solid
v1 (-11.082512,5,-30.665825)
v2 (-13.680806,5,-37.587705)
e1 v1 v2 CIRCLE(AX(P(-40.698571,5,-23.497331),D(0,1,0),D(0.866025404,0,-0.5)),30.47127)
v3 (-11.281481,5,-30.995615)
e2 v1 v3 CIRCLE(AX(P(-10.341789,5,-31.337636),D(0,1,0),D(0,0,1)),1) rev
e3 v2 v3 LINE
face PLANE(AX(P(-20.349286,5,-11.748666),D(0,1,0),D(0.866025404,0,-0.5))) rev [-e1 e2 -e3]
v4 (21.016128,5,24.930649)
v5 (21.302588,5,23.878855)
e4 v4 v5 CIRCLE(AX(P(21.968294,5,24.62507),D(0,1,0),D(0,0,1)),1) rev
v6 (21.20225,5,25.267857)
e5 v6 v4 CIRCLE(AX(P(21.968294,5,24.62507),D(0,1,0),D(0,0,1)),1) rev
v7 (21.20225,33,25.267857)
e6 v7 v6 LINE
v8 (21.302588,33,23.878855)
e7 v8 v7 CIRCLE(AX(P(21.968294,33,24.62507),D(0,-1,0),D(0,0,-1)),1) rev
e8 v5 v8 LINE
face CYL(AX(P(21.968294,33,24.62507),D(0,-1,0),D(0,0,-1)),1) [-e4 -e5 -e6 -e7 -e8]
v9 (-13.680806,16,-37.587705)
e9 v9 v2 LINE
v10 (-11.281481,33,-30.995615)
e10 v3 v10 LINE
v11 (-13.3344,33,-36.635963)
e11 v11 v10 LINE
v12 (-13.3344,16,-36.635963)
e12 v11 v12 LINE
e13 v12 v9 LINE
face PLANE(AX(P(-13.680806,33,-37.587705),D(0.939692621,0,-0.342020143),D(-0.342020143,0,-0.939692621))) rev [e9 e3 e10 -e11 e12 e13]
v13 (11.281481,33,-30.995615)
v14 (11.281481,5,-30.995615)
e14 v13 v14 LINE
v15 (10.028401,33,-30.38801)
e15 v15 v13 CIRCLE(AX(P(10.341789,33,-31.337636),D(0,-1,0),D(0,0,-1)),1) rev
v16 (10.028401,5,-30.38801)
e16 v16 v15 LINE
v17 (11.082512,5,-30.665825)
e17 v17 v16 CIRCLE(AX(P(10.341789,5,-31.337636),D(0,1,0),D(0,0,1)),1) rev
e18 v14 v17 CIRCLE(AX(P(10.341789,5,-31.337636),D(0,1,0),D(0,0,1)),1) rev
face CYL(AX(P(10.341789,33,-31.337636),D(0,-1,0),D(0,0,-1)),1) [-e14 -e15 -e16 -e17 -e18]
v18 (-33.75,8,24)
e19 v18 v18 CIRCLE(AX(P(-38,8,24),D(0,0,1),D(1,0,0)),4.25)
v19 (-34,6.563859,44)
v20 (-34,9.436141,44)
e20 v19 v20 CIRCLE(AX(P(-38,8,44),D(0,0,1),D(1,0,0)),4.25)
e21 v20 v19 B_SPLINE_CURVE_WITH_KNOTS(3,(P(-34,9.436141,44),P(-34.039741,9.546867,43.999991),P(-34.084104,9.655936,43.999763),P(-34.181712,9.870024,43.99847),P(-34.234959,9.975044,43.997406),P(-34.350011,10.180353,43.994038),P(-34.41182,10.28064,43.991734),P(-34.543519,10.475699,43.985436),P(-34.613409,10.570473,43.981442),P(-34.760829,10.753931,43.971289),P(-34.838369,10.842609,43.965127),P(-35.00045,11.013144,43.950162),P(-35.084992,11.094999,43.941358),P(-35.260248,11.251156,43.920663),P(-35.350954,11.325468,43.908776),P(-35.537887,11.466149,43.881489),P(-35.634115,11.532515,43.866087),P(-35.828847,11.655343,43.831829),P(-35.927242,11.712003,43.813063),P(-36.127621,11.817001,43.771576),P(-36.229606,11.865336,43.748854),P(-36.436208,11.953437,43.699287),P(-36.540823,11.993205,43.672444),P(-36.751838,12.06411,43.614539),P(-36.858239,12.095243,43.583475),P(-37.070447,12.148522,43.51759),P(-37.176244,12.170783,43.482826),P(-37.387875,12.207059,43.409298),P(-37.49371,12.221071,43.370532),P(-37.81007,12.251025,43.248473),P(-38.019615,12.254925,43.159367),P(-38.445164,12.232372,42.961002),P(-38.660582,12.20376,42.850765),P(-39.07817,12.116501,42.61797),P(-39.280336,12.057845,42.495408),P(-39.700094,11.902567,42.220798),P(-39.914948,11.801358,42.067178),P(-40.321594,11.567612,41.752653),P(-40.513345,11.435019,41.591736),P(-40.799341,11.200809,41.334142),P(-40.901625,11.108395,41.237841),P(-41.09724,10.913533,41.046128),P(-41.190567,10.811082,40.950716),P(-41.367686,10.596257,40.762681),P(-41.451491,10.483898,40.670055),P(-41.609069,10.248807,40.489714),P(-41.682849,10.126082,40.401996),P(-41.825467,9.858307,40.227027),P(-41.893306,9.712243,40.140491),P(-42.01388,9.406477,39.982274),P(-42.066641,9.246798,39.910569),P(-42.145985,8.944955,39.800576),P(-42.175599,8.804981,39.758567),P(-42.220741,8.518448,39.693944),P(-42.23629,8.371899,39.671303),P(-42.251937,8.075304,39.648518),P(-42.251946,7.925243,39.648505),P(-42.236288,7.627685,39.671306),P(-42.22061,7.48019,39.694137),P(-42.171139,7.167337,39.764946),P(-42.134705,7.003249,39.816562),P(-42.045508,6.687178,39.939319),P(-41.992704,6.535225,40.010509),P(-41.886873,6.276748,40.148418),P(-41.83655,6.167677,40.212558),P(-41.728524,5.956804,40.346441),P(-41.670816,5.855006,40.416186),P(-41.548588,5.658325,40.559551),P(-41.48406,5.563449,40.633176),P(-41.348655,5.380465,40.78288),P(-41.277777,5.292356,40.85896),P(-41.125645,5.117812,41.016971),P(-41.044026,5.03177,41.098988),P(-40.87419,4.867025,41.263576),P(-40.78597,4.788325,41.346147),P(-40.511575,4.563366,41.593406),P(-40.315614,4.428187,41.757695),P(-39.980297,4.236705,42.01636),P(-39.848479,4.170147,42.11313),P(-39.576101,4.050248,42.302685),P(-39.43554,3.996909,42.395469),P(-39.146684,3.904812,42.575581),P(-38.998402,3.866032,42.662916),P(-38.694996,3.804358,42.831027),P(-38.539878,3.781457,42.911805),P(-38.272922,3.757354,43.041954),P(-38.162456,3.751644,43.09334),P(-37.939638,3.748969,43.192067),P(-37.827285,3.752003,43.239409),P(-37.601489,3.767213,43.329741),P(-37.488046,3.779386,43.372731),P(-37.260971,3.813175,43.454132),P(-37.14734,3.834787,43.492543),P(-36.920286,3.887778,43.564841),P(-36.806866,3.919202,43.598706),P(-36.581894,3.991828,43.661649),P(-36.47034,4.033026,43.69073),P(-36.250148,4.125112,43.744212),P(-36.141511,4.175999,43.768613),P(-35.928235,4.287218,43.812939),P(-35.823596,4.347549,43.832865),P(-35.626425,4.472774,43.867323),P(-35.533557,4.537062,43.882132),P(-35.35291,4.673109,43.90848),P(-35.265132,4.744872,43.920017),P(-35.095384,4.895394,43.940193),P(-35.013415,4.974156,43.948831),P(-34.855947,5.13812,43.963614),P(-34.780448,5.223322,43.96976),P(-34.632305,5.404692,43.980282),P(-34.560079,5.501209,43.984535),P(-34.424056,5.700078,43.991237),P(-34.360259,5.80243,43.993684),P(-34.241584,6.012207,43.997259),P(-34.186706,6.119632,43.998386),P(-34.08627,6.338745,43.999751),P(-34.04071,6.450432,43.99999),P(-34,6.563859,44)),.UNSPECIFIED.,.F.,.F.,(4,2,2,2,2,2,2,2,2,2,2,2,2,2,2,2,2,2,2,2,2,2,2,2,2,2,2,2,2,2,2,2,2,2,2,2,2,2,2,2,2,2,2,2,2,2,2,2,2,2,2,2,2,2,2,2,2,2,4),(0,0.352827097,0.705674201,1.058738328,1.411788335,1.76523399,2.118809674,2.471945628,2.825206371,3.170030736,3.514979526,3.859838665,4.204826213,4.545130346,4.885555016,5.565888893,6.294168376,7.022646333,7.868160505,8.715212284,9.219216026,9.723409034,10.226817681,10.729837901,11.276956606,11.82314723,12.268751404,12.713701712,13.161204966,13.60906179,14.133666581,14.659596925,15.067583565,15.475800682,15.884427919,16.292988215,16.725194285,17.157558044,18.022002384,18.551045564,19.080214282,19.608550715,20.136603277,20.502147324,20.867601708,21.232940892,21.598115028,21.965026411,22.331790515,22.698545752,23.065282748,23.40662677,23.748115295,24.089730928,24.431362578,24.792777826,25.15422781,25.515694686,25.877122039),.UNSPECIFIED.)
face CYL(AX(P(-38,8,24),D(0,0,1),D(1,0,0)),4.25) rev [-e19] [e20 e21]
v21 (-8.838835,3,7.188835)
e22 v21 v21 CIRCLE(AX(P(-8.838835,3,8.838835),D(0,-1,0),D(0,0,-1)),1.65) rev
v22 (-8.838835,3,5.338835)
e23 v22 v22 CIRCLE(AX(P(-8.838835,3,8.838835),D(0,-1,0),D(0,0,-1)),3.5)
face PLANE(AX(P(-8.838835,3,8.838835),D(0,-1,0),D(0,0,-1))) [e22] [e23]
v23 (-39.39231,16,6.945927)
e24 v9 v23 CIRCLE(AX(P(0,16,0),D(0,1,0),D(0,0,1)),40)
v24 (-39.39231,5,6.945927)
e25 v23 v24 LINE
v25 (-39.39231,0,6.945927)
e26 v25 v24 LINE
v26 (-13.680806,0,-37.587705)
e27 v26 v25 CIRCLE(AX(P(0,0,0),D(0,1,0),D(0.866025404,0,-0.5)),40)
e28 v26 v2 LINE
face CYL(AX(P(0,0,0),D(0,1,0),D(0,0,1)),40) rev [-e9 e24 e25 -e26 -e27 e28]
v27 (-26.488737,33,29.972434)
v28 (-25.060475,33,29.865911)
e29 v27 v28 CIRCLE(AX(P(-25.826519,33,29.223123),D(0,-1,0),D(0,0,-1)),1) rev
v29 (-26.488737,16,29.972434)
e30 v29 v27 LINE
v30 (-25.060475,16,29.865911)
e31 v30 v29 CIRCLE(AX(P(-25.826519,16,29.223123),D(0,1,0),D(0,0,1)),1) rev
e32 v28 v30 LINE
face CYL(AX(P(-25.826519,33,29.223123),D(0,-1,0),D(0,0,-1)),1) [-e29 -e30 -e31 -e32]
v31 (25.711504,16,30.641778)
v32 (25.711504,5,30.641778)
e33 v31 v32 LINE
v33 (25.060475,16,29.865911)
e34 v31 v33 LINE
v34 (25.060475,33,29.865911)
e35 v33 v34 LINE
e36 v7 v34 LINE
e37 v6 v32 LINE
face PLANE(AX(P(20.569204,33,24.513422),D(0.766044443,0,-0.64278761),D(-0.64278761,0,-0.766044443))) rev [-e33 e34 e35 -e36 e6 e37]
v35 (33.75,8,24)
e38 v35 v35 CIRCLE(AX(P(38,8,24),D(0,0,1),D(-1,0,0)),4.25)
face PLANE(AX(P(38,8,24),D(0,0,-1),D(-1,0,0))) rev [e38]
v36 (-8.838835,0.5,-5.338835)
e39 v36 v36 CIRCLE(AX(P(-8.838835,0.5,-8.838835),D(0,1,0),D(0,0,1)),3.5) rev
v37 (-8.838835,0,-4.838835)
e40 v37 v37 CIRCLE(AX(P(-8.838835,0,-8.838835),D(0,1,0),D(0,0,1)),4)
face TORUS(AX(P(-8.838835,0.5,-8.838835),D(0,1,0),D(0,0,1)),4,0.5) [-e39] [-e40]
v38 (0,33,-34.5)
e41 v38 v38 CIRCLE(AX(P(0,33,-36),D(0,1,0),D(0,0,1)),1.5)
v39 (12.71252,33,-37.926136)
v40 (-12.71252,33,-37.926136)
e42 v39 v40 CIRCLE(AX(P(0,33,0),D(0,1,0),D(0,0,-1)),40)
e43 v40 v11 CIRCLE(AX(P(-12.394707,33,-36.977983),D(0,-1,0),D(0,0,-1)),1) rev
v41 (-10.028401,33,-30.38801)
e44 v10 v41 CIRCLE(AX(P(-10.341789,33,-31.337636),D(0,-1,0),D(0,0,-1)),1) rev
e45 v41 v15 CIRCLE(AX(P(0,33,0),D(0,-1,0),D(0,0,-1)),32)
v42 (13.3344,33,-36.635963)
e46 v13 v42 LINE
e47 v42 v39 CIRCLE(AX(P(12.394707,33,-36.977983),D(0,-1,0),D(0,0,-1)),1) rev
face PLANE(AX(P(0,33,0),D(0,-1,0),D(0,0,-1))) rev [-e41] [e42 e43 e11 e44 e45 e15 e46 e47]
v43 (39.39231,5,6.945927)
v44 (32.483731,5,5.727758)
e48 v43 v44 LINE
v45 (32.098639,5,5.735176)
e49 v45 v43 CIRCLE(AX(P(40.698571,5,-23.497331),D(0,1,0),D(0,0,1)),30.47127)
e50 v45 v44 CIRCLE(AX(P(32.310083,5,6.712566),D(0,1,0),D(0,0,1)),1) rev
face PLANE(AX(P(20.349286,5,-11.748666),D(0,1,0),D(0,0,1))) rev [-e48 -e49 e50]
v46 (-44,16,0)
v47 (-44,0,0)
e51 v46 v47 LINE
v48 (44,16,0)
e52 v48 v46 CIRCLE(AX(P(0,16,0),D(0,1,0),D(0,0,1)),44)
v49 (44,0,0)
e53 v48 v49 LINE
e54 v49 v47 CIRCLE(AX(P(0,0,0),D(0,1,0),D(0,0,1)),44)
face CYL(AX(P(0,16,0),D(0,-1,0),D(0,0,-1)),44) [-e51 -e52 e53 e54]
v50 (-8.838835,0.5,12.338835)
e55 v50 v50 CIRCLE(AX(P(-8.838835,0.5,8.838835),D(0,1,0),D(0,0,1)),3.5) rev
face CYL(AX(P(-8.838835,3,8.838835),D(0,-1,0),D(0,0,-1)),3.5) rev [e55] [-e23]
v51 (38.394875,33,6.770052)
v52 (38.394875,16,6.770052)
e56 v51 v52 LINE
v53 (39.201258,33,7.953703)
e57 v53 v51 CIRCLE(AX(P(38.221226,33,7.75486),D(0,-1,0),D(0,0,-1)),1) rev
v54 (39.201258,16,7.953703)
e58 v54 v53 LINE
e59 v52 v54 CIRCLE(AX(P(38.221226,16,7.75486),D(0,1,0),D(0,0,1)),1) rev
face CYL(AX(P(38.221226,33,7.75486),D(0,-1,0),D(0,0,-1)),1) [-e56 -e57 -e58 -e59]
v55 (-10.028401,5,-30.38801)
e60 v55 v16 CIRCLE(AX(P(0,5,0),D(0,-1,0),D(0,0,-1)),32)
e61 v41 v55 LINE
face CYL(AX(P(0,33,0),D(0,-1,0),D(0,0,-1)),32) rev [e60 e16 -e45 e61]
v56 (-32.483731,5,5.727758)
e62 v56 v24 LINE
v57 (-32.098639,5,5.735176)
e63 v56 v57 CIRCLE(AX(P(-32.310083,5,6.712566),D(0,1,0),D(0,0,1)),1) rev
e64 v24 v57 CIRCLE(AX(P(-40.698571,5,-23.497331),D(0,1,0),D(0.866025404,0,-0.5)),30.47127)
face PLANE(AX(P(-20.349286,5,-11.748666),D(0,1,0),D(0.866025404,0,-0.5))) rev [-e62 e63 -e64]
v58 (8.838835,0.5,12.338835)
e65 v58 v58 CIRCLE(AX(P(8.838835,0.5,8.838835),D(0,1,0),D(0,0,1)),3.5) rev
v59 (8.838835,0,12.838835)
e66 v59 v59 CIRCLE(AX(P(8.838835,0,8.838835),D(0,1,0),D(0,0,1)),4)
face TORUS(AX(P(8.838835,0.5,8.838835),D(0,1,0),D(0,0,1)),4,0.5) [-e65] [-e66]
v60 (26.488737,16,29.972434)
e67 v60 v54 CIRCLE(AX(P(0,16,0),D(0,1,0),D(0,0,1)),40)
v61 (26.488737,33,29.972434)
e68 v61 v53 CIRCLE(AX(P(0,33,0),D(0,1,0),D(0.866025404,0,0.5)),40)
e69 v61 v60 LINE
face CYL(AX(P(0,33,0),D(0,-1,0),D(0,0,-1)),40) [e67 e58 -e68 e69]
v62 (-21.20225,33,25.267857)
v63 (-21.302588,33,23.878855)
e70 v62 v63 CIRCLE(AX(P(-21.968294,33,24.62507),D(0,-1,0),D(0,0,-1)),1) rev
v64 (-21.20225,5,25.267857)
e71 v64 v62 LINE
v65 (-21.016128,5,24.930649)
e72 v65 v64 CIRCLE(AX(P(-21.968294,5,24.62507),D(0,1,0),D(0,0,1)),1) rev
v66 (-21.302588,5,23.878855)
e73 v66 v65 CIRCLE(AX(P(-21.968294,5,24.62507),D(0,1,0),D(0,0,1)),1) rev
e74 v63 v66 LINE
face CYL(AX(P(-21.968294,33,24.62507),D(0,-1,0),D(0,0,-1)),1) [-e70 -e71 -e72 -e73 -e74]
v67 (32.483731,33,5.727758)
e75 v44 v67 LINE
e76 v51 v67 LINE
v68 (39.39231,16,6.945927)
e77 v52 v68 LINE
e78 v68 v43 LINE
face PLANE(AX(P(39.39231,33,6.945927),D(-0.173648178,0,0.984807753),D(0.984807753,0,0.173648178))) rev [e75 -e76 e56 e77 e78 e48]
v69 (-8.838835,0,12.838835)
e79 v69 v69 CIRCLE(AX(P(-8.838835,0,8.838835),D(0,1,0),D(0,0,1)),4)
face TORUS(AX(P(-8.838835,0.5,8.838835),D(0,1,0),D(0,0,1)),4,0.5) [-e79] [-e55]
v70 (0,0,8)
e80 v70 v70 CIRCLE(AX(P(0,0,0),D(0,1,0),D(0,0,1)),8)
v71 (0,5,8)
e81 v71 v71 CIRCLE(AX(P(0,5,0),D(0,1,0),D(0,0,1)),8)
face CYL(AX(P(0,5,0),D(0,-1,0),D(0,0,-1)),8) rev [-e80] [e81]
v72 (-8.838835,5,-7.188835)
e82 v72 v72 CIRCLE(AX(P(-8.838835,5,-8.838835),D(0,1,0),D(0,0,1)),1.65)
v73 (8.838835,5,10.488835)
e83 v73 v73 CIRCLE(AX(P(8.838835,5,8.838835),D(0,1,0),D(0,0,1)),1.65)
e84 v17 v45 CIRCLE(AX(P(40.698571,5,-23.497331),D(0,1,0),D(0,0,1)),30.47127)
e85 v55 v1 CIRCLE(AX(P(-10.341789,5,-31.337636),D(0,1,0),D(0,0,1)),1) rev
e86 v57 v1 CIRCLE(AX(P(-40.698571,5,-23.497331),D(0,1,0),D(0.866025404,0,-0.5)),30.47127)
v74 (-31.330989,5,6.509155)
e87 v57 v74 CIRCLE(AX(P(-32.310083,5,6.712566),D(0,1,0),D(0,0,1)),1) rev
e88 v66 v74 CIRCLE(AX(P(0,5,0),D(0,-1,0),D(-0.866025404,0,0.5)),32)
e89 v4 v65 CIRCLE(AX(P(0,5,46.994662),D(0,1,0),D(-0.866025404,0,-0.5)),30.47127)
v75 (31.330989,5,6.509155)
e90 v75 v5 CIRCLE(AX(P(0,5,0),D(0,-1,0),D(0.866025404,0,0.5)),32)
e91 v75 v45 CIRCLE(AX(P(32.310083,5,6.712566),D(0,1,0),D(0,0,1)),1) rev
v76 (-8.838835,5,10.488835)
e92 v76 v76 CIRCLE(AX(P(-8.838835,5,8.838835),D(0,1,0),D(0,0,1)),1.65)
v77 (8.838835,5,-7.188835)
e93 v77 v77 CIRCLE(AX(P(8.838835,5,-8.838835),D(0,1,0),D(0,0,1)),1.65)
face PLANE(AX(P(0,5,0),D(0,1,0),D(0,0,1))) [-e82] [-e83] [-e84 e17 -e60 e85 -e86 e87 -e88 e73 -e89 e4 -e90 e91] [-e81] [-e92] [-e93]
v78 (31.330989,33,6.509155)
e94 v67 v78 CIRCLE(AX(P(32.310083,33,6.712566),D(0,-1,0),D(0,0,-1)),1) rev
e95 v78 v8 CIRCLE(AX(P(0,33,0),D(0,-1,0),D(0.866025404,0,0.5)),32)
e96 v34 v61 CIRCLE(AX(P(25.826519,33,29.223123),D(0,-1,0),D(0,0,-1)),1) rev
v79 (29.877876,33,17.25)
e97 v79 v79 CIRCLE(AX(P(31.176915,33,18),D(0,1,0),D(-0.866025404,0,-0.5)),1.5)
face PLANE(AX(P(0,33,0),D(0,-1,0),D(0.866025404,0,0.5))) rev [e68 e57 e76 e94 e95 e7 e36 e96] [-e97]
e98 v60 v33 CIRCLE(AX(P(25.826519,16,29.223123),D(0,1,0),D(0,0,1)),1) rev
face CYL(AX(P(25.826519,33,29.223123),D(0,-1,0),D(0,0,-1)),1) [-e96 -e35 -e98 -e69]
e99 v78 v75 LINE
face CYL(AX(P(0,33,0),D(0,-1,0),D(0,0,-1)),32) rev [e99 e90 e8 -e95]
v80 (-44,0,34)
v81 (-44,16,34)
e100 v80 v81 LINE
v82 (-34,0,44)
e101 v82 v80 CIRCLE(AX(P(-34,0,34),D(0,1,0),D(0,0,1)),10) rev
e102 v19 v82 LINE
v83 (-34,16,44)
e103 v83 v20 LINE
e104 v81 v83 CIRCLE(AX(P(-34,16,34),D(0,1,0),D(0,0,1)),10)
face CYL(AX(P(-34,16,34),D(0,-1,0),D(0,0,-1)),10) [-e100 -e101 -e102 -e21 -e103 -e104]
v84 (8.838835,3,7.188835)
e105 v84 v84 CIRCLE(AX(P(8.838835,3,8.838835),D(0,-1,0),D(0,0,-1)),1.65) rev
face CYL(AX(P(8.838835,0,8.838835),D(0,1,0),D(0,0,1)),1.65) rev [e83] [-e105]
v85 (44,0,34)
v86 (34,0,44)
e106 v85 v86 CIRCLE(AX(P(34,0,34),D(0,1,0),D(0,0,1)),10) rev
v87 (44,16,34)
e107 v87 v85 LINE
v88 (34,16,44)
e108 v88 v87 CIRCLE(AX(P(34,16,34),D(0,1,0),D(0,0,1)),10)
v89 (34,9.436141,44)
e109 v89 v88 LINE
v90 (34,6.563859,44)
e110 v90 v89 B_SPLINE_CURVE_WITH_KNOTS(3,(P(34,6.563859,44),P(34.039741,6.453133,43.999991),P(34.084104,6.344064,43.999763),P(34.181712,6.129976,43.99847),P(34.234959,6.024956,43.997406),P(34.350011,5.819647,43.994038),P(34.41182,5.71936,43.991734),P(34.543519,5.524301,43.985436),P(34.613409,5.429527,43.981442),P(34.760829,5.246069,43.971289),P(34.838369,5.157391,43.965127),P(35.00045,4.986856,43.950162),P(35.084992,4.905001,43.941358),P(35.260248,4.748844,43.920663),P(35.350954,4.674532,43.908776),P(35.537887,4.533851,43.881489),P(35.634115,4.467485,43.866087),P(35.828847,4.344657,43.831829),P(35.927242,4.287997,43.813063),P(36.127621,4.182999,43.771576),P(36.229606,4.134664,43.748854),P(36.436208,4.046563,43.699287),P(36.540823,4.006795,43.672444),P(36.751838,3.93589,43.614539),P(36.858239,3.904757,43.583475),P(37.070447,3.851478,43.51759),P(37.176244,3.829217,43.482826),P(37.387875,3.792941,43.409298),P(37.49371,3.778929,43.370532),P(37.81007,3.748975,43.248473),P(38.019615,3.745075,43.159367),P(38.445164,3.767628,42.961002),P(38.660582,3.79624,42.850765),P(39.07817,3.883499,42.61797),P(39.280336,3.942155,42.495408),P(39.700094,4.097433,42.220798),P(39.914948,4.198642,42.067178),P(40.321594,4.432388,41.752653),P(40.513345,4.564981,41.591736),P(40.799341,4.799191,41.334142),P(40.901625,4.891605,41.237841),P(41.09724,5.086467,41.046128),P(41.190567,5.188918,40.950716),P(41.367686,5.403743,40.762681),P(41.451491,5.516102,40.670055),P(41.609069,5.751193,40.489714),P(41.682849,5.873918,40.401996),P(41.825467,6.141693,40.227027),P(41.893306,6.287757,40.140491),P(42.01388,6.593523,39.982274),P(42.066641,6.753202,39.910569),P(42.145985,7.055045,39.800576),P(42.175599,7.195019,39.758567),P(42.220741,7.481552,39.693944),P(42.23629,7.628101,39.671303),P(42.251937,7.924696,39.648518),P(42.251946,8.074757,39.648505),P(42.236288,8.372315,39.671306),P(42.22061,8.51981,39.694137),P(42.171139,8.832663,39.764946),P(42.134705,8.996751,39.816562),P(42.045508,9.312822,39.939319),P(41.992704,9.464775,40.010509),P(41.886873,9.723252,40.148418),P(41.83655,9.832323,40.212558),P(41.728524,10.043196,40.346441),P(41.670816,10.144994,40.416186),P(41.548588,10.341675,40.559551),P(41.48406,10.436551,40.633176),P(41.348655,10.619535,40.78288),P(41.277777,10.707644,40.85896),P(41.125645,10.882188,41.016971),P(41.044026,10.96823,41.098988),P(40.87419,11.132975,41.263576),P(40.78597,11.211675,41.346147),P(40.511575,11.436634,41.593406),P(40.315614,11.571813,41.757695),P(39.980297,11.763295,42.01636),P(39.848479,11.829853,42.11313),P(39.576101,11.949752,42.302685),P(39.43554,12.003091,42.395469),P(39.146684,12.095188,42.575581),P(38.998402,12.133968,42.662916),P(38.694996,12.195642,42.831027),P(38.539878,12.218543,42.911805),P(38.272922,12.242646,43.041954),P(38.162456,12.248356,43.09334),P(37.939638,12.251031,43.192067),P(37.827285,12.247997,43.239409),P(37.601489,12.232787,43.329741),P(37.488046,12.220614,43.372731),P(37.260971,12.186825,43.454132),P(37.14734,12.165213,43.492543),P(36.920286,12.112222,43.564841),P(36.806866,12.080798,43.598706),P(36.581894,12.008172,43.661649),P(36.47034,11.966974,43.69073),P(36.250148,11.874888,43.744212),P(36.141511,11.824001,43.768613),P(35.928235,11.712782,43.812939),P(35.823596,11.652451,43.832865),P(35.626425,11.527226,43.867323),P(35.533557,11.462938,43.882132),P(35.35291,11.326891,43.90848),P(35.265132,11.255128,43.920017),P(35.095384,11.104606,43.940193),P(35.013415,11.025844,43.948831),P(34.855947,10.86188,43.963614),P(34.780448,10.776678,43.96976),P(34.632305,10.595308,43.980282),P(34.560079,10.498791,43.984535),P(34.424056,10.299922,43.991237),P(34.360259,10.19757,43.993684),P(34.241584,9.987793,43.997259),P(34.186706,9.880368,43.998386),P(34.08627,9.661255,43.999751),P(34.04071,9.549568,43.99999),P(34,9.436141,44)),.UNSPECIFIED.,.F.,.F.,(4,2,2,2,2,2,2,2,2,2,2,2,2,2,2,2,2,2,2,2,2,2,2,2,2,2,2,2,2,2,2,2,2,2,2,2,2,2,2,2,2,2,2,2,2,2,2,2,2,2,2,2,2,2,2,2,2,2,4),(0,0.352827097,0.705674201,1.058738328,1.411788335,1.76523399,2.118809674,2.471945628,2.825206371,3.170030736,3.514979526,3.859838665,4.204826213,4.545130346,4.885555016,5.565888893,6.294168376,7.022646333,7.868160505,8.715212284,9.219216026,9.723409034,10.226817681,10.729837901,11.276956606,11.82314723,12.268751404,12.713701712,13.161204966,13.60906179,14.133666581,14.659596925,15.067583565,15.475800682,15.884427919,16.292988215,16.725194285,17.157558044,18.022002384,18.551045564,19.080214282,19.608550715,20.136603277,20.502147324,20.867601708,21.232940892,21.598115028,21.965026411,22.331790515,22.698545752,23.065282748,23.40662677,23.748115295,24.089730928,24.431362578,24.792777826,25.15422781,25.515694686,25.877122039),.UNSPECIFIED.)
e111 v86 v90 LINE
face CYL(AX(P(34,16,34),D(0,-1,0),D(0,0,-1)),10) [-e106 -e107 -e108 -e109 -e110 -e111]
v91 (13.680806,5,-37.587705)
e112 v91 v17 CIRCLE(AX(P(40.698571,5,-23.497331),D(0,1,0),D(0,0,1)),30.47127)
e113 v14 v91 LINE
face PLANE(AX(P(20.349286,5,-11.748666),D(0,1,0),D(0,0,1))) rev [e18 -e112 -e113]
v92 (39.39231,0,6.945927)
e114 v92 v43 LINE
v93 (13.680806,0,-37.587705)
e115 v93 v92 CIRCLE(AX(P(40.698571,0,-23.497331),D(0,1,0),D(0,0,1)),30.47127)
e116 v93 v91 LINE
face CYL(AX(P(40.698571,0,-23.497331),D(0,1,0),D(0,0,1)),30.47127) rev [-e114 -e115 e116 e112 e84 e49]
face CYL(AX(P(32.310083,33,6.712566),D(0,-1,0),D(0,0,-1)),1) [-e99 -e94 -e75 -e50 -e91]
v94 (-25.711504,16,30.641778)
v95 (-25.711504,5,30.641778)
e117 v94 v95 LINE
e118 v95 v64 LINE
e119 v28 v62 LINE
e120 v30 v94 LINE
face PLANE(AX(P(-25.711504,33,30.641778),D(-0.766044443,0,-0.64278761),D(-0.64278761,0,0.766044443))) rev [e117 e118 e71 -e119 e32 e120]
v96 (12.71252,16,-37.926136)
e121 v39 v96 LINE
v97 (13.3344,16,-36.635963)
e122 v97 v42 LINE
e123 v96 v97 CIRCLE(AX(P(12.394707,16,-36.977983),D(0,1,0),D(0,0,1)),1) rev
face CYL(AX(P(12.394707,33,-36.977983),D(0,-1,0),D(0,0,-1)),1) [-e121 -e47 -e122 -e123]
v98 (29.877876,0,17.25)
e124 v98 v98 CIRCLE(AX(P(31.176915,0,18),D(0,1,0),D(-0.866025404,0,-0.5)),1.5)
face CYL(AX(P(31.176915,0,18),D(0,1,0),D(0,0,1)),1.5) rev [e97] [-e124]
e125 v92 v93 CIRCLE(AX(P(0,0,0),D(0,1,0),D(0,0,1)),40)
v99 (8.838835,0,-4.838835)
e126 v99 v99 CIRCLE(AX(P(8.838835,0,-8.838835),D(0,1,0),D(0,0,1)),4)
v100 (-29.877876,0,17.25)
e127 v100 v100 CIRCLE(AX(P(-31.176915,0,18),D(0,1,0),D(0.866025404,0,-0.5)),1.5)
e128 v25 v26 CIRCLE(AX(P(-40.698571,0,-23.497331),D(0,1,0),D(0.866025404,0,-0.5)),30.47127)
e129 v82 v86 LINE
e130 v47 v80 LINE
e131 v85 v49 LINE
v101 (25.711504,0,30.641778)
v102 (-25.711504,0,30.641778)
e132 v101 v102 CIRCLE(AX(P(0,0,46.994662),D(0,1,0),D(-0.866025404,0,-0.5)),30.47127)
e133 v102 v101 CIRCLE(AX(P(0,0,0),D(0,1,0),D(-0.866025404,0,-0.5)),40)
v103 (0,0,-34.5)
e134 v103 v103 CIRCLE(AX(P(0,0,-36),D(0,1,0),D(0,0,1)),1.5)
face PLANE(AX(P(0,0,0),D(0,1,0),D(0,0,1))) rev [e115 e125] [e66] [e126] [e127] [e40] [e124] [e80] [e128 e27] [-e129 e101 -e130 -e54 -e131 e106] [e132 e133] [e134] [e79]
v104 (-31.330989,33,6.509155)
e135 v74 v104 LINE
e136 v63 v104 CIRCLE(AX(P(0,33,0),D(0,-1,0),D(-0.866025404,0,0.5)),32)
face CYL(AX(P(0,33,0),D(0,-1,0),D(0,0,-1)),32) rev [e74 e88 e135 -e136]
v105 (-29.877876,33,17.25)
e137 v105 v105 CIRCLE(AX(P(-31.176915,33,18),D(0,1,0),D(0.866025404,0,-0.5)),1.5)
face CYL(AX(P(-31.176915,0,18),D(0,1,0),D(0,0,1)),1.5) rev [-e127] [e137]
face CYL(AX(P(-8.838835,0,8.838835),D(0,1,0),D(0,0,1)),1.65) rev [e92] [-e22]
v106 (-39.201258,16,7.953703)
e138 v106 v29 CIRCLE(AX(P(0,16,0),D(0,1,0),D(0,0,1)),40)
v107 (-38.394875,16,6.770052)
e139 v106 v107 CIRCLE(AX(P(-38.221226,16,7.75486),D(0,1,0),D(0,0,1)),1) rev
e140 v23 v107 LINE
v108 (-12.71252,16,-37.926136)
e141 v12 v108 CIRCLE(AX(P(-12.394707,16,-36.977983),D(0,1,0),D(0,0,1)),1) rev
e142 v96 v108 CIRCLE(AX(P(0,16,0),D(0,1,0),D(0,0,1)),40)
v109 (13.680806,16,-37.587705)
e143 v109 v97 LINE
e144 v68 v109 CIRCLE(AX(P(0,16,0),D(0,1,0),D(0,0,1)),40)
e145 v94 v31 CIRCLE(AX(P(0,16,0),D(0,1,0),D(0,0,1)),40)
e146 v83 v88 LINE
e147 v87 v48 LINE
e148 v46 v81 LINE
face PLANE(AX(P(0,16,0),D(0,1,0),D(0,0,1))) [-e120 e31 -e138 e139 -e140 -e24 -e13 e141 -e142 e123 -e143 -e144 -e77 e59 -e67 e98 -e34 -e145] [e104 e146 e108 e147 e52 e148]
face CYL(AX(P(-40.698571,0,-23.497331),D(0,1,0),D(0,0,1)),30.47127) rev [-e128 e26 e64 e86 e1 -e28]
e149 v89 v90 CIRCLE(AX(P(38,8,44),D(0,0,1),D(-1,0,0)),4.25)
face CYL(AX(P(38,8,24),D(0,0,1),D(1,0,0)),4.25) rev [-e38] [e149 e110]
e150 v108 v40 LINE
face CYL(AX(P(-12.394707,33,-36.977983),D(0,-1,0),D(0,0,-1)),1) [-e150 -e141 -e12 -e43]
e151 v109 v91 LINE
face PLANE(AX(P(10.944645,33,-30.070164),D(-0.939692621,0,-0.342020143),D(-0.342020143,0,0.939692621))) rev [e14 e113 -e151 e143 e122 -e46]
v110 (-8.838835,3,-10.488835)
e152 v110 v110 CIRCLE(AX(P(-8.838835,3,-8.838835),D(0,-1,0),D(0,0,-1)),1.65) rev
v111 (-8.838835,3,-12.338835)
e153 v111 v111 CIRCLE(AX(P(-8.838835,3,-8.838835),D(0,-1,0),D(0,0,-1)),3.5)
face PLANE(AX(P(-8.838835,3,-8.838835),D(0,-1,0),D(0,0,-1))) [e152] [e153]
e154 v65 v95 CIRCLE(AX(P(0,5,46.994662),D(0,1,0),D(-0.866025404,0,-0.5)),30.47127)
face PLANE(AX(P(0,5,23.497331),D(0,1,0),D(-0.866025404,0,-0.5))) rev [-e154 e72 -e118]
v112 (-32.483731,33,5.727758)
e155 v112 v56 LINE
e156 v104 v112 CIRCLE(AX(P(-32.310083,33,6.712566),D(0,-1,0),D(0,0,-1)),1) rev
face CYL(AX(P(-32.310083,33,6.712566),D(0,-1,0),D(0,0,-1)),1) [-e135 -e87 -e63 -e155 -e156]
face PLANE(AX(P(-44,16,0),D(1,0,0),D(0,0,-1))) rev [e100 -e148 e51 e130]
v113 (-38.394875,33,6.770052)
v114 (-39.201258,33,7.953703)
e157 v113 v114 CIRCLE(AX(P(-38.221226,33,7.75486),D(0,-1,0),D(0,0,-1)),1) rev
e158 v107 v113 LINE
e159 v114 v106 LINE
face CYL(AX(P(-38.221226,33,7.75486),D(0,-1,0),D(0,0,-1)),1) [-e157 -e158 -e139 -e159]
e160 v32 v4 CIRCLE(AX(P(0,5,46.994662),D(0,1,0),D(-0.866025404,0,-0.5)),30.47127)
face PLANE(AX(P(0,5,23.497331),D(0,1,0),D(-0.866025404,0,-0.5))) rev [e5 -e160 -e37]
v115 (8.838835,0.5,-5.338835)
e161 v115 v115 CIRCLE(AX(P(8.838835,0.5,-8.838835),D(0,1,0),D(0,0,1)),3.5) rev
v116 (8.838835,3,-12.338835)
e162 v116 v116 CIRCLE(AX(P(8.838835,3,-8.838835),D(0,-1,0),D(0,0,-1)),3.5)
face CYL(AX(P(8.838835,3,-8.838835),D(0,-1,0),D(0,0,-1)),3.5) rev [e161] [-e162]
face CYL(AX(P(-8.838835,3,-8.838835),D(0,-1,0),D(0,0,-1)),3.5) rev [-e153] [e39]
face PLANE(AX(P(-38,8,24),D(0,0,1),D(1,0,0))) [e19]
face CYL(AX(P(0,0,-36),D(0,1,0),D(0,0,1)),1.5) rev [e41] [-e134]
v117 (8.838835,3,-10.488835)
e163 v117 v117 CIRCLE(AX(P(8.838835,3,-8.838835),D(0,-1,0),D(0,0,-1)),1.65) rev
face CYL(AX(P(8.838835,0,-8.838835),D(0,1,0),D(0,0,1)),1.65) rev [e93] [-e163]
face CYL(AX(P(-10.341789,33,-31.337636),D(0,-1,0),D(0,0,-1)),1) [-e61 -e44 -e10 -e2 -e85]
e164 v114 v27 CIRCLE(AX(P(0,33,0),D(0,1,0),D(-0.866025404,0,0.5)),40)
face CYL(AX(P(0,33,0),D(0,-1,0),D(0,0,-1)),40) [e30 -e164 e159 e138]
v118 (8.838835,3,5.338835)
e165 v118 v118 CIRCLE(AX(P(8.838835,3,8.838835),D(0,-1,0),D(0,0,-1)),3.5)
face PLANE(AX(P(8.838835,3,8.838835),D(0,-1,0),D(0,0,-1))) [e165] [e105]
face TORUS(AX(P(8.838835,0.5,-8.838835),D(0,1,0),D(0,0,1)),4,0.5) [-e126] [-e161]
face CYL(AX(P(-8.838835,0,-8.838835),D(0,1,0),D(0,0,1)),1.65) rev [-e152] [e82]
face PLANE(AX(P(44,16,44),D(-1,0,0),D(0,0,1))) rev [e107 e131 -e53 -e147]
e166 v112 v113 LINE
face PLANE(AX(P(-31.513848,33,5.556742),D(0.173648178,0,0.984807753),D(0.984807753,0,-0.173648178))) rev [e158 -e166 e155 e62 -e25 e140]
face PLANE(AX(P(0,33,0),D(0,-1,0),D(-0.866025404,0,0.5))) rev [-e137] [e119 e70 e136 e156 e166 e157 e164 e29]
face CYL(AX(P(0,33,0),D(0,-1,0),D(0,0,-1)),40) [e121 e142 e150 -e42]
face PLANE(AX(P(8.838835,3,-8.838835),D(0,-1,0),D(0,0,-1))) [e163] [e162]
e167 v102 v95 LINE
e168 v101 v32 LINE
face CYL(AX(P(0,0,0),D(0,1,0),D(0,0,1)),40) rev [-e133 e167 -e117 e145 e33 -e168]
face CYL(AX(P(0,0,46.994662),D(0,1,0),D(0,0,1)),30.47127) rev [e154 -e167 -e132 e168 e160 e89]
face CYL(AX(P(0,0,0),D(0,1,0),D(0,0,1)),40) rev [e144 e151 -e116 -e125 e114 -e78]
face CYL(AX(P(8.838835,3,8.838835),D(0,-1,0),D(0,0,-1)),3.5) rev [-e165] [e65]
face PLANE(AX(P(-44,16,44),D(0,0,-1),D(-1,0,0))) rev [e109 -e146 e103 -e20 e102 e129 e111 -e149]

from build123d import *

# Parameters (mm, degrees)
BOSS_EXTRUDE1_DEPTH = 16
SKETCH2_R           = 4.25
CUT_EXTRUDE1_DEPTH  = 20
FILLET1_R           = 10
SKETCH3_R           = 40
CUT_EXTRUDE2_DEPTH  = 65.249513779
SKETCH5_R           = 40.5
SKETCH5_R_2         = 8
BOSS_EXTRUDE2_DEPTH = 5
BOSS_EXTRUDE3_START = 28
BOSS_EXTRUDE3_DEPTH = 28
SKETCH7_R           = 1.5
CUT_EXTRUDE3_DEPTH  = 71.434366784
CIRPATTERN1_COUNT   = 3
SKETCH8_R           = 1.65
CUT_EXTRUDE4_DEPTH  = 69.234888566
SKETCH9_R           = 3.5
CUT_EXTRUDE5_DEPTH  = 3
FILLET2_R           = 0.5
CUT_EXTRUDE6_DEPTH  = 69.234888566
CIRPATTERN2_COUNT   = 3
FILLET4_R           = 1


with BuildPart() as part:
    # Sketch1 → Boss-Extrude1 (new body)
    with BuildSketch(Plane(origin=(0, 0, 0), x_dir=(1, 0, 0), z_dir=(0, 1, 0))):
        with BuildLine():
            Line((-44, 0), (-44, -44))
            Line((-44, -44), (44, -44))
            Line((44, -44), (44, 0))
            ThreePointArc((44, 0), (0, 44), (-44, 0))
        make_face()
    extrude(amount=BOSS_EXTRUDE1_DEPTH)

    # Sketch2 → Cut-Extrude1 (cut)
    with BuildSketch(Plane.XY.offset(44)):
        with Locations((-38, 8)):
            Circle(SKETCH2_R)
        with Locations(Location((38, 8, 0), (0, 0, 180))):
            Circle(SKETCH2_R)
    extrude(amount=-CUT_EXTRUDE1_DEPTH, mode=Mode.SUBTRACT)

    # Fillet1
    # the kernel refuses this fillet: 10 mm, written as the material it takes off along each edge
    with BuildSketch(Plane(origin=(44, -25, 44), x_dir=(-1, 0, 0), z_dir=(0, 1, 0)), Plane(origin=(-44, -25, 44), x_dir=(0, 0, -1), z_dir=(0, 1, 0))) as fillet1_piece_1:
        with BuildLine():
            CenterArc((FILLET1_R, -FILLET1_R), FILLET1_R, 90, 90)
            Line((0, -FILLET1_R), (0, 0))
            Line((0, 0), (FILLET1_R, 0))
        make_face()
    extrude(amount=66, mode=Mode.SUBTRACT)

    # Sketch3 → Cut-Extrude2 (cut, through all)
    with BuildSketch(Plane(origin=(0, 16, 0), x_dir=(1, 0, 0), z_dir=(0, 1, 0))):
        with Locations(Location((0, 0, 0), (0, 0, 270))):
            Circle(SKETCH3_R)
    extrude(amount=-CUT_EXTRUDE2_DEPTH, mode=Mode.SUBTRACT)

    # Sketch5 → Boss-Extrude2 (add)
    with BuildSketch(Plane(origin=(0, 0, 0), x_dir=(1, 0, 0), z_dir=(0, 1, 0))):
        Circle(SKETCH5_R)
        with Locations(Location((0, 0, 0), (0, 0, 270))):
            Circle(SKETCH5_R_2, mode=Mode.SUBTRACT)
    extrude(amount=BOSS_EXTRUDE2_DEPTH)

    # Sketch6 → Boss-Extrude3 (add)
    with BuildSketch(Plane(origin=(0, 5, 0), x_dir=(1, 0, 0), z_dir=(0, 1, 0)).offset(BOSS_EXTRUDE3_START)):
        with BuildLine():
            Line((-13.680805733, 37.587704831), (-10.944644586, 30.070163865))
            ThreePointArc((-10.944644586, 30.070163865), (0, 32), (10.944644586, 30.070163865))
            Line((10.944644586, 30.070163865), (13.680805733, 37.587704831))
            ThreePointArc((13.680805733, 37.587704831), (0, 40), (-13.680805733, 37.587704831))
        make_face()
    boss_extrude3 = extrude(amount=-BOSS_EXTRUDE3_DEPTH)

    # Sketch7 → Cut-Extrude3 (cut, through all)
    with BuildSketch(Plane(origin=(0, 33, 0), x_dir=(1, 0, 0), z_dir=(0, 1, 0))):
        with Locations(Location((0, 36, 0), (0, 0, 270))):
            Circle(SKETCH7_R)
    cut_extrude3 = extrude(amount=-CUT_EXTRUDE3_DEPTH, mode=Mode.SUBTRACT)

    # CirPattern1: Boss-Extrude3, Cut-Extrude3 ×3 about axis
    cirpattern1_axis = Axis((0, 0, 0), (0, 1, 0))
    add([boss_extrude3.rotate(cirpattern1_axis, i * 360 / CIRPATTERN1_COUNT) for i in range(1, CIRPATTERN1_COUNT)])
    add([cut_extrude3.rotate(cirpattern1_axis, i * 360 / CIRPATTERN1_COUNT) for i in range(1, CIRPATTERN1_COUNT)], mode=Mode.SUBTRACT)

    # Sketch8 → Cut-Extrude4 (cut, through all)
    with BuildSketch(Plane(origin=(0, 5, 0), x_dir=(1, 0, 0), z_dir=(0, 1, 0))):
        with Locations(Location((-8.838834765, 8.838834765, 0), (0, 0, 270))):
            Circle(SKETCH8_R)
        with Locations(Location((8.838834765, 8.838834765, 0), (0, 0, 270))):
            Circle(SKETCH8_R)
        with Locations(Location((8.838834765, -8.838834765, 0), (0, 0, 270))):
            Circle(SKETCH8_R)
        with Locations(Location((-8.838834765, -8.838834765, 0), (0, 0, 270))):
            Circle(SKETCH8_R)
    extrude(amount=-CUT_EXTRUDE4_DEPTH, mode=Mode.SUBTRACT)

    # Sketch9 → Cut-Extrude5 (cut)
    with BuildSketch(Plane.XZ):
        with Locations(Location((8.838834765, 8.838834765, 0), (0, 0, 270))):
            Circle(SKETCH9_R)
        with Locations(Location((-8.838834765, 8.838834765, 0), (0, 0, 270))):
            Circle(SKETCH9_R)
        with Locations(Location((8.838834765, -8.838834765, 0), (0, 0, 270))):
            Circle(SKETCH9_R)
        with Locations(Location((-8.838834765, -8.838834765, 0), (0, 0, 270))):
            Circle(SKETCH9_R)
    extrude(amount=-CUT_EXTRUDE5_DEPTH, mode=Mode.SUBTRACT)

    # Fillet2
    fillet2_edges = [part.edges().sort_by_distance(p)[0] for p in [
        (-8.838834765, 0, 12.338834765),
        (8.838834765, 0, -5.338834765),
        (-8.838834765, 0, -5.338834765),
        (8.838834765, 0, 12.338834765),
    ]]
    fillet(fillet2_edges, radius=FILLET2_R)

    # Sketch10 → Cut-Extrude6 (cut, through all)
    with BuildSketch(Plane(origin=(0, 5, 0), x_dir=(1, 0, 0), z_dir=(0, 1, 0))):
        with BuildLine():
            ThreePointArc((13.680805733, 37.587704831), (14.309677586, 8.261696207), (39.39231012, -6.945927107))
            ThreePointArc((39.39231012, -6.945927107), (34.641016151, 20), (13.680805733, 37.587704831))
        make_face()
    cut_extrude6 = extrude(amount=-CUT_EXTRUDE6_DEPTH, mode=Mode.SUBTRACT)

    # CirPattern2: Cut-Extrude6 ×3 about axis
    cirpattern2_axis = Axis((0, 0, 0), (0, 1, 0))
    for i in range(1, CIRPATTERN2_COUNT):
        add(cut_extrude6.rotate(cirpattern2_axis, i * 360 / CIRPATTERN2_COUNT), mode=Mode.SUBTRACT)

    # Fillet4
    # the kernel refuses this fillet: 1 mm, written as the material it takes off along each edge
    with BuildSketch(Plane(origin=(13.680805733, 35.56431335, -37.587704831), x_dir=(-0.3420201433256679, 0, 0.9396926207859085), z_dir=(0, -1, 0)), Plane(origin=(-39.39231012, 35.56431335, 6.945927107), x_dir=(0.9848077530122079, 0, -0.17364817766693066), z_dir=(0, -1, 0))) as fillet4_piece_1:
        with BuildLine():
            CenterArc((1.012822621, 1), FILLET4_R, 178.530716419, 91.469283581)
            ThreePointArc((0.013151406, 1.025641026), (0.003287987, 0.51286267), (0, 0))
            Line((0, 0), (1.012822621, 0))
        make_face()
    extrude(amount=19.56431335, mode=Mode.SUBTRACT)
    with BuildSketch(Plane(origin=(-13.680805733, 35.56431335, -37.587704831), x_dir=(0.3420201433256646, 0, 0.93969262078591), z_dir=(0, -1, 0)), Plane(origin=(39.39231012, 35.56431335, 6.945927107), x_dir=(-0.984807753012207, 0, -0.17364817766693638), z_dir=(0, -1, 0))) as fillet4_piece_2:
        with BuildLine():
            CenterArc((1.012822621, -1), FILLET4_R, 90, 91.469283581)
            ThreePointArc((0.013151406, -1.025641026), (0.003287987, -0.51286267), (0, 0))
            Line((0, 0), (1.012822621, 0))
        make_face()
    extrude(amount=19.56431335, mode=Mode.SUBTRACT)
    with BuildSketch(Plane(origin=(-10.944644586, 35.462112512, -30.070163865), x_dir=(-0.34202014332566283, 0, -0.9396926207859105), z_dir=(0, -1, 0)), Plane(origin=(-20.56920351, 35.462112512, 24.51342218), x_dir=(-0.6427876096865429, 0, 0.766044443118975), z_dir=(0, -1, 0)), Plane(origin=(31.513848096, 35.462112512, 5.556741685), x_dir=(0.984807753012207, 0, 0.1736481776669362), z_dir=(0, -1, 0))) as fillet4_piece_3:
        with BuildLine():
            CenterArc((0.984845005, 1), FILLET4_R, 181.736501576, 88.263498424)
            ThreePointArc((-0.014695753, 0.96969697), (-0.003674149, 0.48490416), (0, 0))
            Line((0, 0), (0.984845005, 0))
        make_face()
    extrude(amount=30.462112512, mode=Mode.SUBTRACT)
    with BuildSketch(Plane(origin=(10.944644586, 35.462112512, -30.070163865), x_dir=(0.34202014332566955, 0, -0.9396926207859082), z_dir=(0, -1, 0)), Plane(origin=(-31.513848096, 35.462112512, 5.556741685), x_dir=(-0.9848077530122084, 0, 0.17364817766692914), z_dir=(0, -1, 0)), Plane(origin=(20.56920351, 35.462112512, 24.51342218), x_dir=(0.6427876096865386, 0, 0.7660444431189787), z_dir=(0, -1, 0))) as fillet4_piece_4:
        with BuildLine():
            CenterArc((0.984845005, -1), FILLET4_R, 90, 88.263498424)
            ThreePointArc((-0.014695753, -0.96969697), (-0.003674149, -0.48490416), (0, 0))
            Line((0, 0), (0.984845005, 0))
        make_face()
    extrude(amount=30.462112512, mode=Mode.SUBTRACT)
    with BuildSketch(Plane(origin=(-25.711504387, 35.56431335, 30.641777725), x_dir=(-0.7577399302790805, 0, -0.6525566627202992), z_dir=(0, -1, 0))) as fillet4_piece_5:
        with BuildLine():
            CenterArc((1.012903773, 0.9999178), FILLET4_R, 179.265358209, 91.469283581)
            Line((0.012985973, 1.012739367), (0, 0))
            ThreePointArc((0, 0), (0.51286267, -0.003287987), (1.02572534, 0))
        make_face()
    extrude(amount=19.56431335, mode=Mode.SUBTRACT)
    with BuildSketch(Plane(origin=(25.711504387, 35.56431335, 30.641777725), x_dir=(0.7577399302790873, 0, -0.6525566627202912), z_dir=(0, -1, 0))) as fillet4_piece_6:
        with BuildLine():
            CenterArc((1.012903773, -0.9999178), FILLET4_R, 89.265358209, 91.469283581)
            Line((0.012985973, -1.012739367), (0, 0))
            ThreePointArc((0, 0), (0.51286267, 0.003287987), (1.02572534, 0))
        make_face()
    extrude(amount=19.56431335, mode=Mode.SUBTRACT)


solid = part.part
